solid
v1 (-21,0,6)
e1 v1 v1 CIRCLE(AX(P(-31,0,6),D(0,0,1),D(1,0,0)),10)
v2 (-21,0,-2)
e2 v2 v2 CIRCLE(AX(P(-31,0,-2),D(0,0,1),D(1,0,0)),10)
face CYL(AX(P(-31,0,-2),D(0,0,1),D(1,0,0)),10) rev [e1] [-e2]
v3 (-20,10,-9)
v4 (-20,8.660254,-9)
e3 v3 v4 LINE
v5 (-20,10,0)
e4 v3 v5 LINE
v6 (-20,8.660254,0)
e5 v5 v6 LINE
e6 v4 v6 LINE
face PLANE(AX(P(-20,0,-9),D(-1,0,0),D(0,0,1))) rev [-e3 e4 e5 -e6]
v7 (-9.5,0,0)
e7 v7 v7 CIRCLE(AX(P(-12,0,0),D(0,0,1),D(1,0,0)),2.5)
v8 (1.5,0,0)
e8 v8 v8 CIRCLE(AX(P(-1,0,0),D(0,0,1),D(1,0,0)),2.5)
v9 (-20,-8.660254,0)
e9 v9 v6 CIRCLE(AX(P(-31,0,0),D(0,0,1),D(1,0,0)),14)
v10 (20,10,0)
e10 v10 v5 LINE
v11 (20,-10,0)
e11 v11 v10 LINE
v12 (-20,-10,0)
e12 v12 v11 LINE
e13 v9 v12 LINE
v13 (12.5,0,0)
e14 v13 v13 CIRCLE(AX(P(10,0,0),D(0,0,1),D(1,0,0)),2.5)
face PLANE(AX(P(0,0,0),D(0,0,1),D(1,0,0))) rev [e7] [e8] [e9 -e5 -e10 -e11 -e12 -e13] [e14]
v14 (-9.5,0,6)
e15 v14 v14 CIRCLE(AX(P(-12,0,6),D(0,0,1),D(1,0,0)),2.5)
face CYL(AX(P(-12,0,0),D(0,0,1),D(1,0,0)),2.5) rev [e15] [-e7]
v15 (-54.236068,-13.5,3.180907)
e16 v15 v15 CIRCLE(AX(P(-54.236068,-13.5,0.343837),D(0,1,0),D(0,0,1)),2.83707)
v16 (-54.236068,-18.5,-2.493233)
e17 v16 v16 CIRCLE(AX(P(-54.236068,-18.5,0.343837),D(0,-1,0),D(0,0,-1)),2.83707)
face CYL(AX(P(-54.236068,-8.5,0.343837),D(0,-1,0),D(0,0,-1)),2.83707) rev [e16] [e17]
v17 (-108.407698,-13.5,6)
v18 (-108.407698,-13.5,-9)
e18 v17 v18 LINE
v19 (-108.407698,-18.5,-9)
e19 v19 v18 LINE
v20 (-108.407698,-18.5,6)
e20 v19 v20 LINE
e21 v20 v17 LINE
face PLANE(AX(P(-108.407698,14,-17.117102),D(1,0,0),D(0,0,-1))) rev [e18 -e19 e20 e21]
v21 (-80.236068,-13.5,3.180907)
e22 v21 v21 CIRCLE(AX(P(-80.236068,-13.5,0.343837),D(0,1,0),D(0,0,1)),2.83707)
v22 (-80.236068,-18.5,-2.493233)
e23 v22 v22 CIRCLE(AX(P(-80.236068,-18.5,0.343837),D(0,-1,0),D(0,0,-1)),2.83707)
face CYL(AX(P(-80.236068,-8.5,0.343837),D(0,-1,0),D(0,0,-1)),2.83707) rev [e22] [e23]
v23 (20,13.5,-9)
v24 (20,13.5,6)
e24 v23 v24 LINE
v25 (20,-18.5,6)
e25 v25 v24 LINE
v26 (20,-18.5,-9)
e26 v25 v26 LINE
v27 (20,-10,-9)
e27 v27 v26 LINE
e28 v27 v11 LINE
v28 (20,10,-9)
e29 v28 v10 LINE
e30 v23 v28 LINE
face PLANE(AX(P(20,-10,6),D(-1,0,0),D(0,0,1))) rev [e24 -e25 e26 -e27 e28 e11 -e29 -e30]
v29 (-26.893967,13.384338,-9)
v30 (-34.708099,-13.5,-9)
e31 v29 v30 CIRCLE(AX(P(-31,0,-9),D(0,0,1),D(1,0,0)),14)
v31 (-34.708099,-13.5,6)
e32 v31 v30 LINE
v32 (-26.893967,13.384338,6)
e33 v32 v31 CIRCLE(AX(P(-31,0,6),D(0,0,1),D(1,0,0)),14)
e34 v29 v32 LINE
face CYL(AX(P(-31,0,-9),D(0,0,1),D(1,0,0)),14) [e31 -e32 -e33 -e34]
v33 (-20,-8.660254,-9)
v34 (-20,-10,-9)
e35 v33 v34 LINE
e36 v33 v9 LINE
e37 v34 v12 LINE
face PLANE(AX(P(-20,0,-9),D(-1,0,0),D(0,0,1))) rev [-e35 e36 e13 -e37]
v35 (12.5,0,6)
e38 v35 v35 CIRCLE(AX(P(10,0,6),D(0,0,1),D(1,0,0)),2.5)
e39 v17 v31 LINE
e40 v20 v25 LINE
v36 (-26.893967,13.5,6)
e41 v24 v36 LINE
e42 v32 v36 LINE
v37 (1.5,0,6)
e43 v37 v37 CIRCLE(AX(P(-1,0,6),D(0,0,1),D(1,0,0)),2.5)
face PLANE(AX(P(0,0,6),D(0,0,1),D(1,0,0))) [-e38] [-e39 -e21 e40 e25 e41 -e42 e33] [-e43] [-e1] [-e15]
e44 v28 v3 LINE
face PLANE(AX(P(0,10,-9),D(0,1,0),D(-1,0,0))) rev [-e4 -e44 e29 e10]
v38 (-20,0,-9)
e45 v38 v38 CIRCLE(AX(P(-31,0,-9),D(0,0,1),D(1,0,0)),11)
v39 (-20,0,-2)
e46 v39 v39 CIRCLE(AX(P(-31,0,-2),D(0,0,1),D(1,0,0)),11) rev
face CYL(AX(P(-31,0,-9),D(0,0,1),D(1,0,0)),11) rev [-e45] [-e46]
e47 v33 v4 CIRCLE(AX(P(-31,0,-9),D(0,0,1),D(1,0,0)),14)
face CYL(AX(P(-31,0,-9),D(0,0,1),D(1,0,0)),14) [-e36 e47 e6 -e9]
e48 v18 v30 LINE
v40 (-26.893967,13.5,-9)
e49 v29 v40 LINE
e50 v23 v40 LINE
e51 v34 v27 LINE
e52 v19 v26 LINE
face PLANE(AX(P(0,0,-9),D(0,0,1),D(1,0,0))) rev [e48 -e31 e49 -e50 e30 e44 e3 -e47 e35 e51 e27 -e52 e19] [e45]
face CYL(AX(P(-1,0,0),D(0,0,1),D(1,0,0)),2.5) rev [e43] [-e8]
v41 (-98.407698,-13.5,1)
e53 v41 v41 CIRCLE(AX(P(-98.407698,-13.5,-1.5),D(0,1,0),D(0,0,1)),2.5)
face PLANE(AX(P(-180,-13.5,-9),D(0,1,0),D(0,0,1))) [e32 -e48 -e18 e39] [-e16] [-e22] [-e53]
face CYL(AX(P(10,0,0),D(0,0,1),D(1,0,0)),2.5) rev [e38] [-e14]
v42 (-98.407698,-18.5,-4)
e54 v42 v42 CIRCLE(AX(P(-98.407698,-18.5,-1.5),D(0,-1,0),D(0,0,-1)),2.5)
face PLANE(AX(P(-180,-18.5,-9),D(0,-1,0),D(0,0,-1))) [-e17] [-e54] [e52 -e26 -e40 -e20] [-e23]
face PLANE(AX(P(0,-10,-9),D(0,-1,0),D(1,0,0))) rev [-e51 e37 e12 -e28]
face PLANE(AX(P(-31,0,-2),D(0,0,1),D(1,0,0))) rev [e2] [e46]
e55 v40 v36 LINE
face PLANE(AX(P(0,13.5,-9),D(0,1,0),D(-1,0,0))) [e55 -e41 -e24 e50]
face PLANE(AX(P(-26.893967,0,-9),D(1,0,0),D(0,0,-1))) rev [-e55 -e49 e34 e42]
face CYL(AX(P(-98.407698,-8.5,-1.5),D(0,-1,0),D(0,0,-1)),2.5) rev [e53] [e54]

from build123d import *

# Parameters (mm, degrees)
SKETCH_1_W          = 40
SKETCH_1_H          = 20
EXTRUDE_1_DEPTH     = 6
SKETCH_2_R          = 2.5
CUT_EXTRUDE_1_DEPTH = 24.151673806
EXTRUDE_START       = -15
EXTRUDE_2_OUTLINE_R = 11
EXTRUDE_2_DEPTH     = 15
EXTRUDE_START_2     = -8
SKETCH_5_R          = 11
SKETCH_5_R_2        = 10
EXTRUDE_3_DEPTH     = 8
SKETCH_10_W         = 15
SKETCH_10_H         = 5
EXTRUDE_4_DEPTH     = 200
SKETCH_11_W         = 3.09493726
SKETCH_11_H         = 3.09493726
EXTRUDE_5_DEPTH     = 15
SKETCH_17_W         = 83.501719846
SKETCH_17_H         = 42.356909186
CUT_EXTRUDE_2_DEPTH = 184.131783151
SKETCH_18_R         = 2.5
CUT_EXTRUDE_3_DEPTH = 10
SKETCH_20_R         = 2.837069856
CUT_EXTRUDE_4_DEPTH = 10


# Read off the part's stored shape, not the designer's step: 凸台-拉伸2
with BuildPart() as part:
    # 草图1 → 凸台-拉伸1 (new body)
    with BuildSketch(Plane.XY):
        Rectangle(SKETCH_1_W, SKETCH_1_H)
    extrude(amount=EXTRUDE_1_DEPTH)

    # 草图2 → 切除-拉伸1 (cut, through all)
    with BuildSketch(Plane.XY.offset(6)):
        with Locations((10, 0)):
            Circle(SKETCH_2_R)
        with Locations((-1, 0)):
            Circle(SKETCH_2_R)
        with Locations((-12, 0)):
            Circle(SKETCH_2_R)
    extrude(amount=-CUT_EXTRUDE_1_DEPTH, mode=Mode.SUBTRACT)

    # 凸台-拉伸2 outline → 凸台-拉伸2 (add)
    with BuildSketch(Plane.XY.offset(6).offset(EXTRUDE_START)):
        with BuildLine():
            Line((20, 10), (20, 13.5))
            Line((20, 13.5), (-26.893967141, 13.5))
            Line((-26.893967141, 13.5), (-26.893967141, 13.384337644))
            ThreePointArc((-26.893967141, 13.384337644), (-45, 0), (-26.893967141, -13.384337644))
            Line((-26.893967141, -13.384337644), (-26.893967141, -13.5))
            Line((-26.893967141, -13.5), (20, -13.5))
            Line((20, -13.5), (20, -10))
            Line((20, -10), (-20, -10))
            Line((-20, -10), (-20, -8.660254038))
            ThreePointArc((-20, -8.660254038), (-17, 0), (-20, 8.660254038))
            Line((-20, 8.660254038), (-20, 10))
            Line((-20, 10), (20, 10))
        make_face()
        with Locations((-31, 0)):
            Circle(EXTRUDE_2_OUTLINE_R, mode=Mode.SUBTRACT)
    extrude(amount=EXTRUDE_2_DEPTH)

    # 草图5 → 凸台-拉伸3 (add)
    with BuildSketch(Plane.XY.offset(6).offset(EXTRUDE_START_2)):
        with Locations((-31, 0)):
            Circle(SKETCH_5_R)
        with Locations((-31, 0)):
            Circle(SKETCH_5_R_2, mode=Mode.SUBTRACT)
    extrude(amount=EXTRUDE_3_DEPTH)

    # 草图10 → 凸台-拉伸4 (add)
    with BuildSketch(Plane(origin=(20, 0, 0), x_dir=(0, 0, -1), z_dir=(1, 0, 0))):
        with Locations((1.5, -16)):
            Rectangle(SKETCH_10_W, SKETCH_10_H)
    extrude(amount=-EXTRUDE_4_DEPTH)

    # 草图11 → 凸台-拉伸5 (add, through all)
    with BuildSketch(Plane.XY.offset(6)):
        with Locations((-27.071814196, -13.413570993)):
            Rectangle(SKETCH_11_W, SKETCH_11_H)
    extrude(amount=-EXTRUDE_5_DEPTH)

    # 草图17 → 切除-拉伸2 (cut, through all)
    with BuildSketch(Plane.XZ.offset(18.5)):
        with Locations((-150.158557574, 4.061352957)):
            Rectangle(SKETCH_17_W, SKETCH_17_H)
    extrude(amount=-CUT_EXTRUDE_2_DEPTH, mode=Mode.SUBTRACT)

    # 草图18 → 切除-拉伸3 (cut)
    with BuildSketch(Plane.XZ.offset(18.5)):
        with Locations(Location((-98.407697651, -1.5, 0), (0, 0, 270))):
            Circle(SKETCH_18_R)
    extrude(amount=-CUT_EXTRUDE_3_DEPTH, mode=Mode.SUBTRACT)

    # 草图20 → 切除-拉伸4 (cut)
    with BuildSketch(Plane.XZ.offset(18.5)):
        with Locations(Location((-54.23606844, 0.343836832, 0), (0, 0, 270))):
            Circle(SKETCH_20_R)
        with Locations(Location((-80.23606844, 0.343836832, 0), (0, 0, 270))):
            Circle(SKETCH_20_R)
    extrude(amount=-CUT_EXTRUDE_4_DEPTH, mode=Mode.SUBTRACT)


solid = part.part
